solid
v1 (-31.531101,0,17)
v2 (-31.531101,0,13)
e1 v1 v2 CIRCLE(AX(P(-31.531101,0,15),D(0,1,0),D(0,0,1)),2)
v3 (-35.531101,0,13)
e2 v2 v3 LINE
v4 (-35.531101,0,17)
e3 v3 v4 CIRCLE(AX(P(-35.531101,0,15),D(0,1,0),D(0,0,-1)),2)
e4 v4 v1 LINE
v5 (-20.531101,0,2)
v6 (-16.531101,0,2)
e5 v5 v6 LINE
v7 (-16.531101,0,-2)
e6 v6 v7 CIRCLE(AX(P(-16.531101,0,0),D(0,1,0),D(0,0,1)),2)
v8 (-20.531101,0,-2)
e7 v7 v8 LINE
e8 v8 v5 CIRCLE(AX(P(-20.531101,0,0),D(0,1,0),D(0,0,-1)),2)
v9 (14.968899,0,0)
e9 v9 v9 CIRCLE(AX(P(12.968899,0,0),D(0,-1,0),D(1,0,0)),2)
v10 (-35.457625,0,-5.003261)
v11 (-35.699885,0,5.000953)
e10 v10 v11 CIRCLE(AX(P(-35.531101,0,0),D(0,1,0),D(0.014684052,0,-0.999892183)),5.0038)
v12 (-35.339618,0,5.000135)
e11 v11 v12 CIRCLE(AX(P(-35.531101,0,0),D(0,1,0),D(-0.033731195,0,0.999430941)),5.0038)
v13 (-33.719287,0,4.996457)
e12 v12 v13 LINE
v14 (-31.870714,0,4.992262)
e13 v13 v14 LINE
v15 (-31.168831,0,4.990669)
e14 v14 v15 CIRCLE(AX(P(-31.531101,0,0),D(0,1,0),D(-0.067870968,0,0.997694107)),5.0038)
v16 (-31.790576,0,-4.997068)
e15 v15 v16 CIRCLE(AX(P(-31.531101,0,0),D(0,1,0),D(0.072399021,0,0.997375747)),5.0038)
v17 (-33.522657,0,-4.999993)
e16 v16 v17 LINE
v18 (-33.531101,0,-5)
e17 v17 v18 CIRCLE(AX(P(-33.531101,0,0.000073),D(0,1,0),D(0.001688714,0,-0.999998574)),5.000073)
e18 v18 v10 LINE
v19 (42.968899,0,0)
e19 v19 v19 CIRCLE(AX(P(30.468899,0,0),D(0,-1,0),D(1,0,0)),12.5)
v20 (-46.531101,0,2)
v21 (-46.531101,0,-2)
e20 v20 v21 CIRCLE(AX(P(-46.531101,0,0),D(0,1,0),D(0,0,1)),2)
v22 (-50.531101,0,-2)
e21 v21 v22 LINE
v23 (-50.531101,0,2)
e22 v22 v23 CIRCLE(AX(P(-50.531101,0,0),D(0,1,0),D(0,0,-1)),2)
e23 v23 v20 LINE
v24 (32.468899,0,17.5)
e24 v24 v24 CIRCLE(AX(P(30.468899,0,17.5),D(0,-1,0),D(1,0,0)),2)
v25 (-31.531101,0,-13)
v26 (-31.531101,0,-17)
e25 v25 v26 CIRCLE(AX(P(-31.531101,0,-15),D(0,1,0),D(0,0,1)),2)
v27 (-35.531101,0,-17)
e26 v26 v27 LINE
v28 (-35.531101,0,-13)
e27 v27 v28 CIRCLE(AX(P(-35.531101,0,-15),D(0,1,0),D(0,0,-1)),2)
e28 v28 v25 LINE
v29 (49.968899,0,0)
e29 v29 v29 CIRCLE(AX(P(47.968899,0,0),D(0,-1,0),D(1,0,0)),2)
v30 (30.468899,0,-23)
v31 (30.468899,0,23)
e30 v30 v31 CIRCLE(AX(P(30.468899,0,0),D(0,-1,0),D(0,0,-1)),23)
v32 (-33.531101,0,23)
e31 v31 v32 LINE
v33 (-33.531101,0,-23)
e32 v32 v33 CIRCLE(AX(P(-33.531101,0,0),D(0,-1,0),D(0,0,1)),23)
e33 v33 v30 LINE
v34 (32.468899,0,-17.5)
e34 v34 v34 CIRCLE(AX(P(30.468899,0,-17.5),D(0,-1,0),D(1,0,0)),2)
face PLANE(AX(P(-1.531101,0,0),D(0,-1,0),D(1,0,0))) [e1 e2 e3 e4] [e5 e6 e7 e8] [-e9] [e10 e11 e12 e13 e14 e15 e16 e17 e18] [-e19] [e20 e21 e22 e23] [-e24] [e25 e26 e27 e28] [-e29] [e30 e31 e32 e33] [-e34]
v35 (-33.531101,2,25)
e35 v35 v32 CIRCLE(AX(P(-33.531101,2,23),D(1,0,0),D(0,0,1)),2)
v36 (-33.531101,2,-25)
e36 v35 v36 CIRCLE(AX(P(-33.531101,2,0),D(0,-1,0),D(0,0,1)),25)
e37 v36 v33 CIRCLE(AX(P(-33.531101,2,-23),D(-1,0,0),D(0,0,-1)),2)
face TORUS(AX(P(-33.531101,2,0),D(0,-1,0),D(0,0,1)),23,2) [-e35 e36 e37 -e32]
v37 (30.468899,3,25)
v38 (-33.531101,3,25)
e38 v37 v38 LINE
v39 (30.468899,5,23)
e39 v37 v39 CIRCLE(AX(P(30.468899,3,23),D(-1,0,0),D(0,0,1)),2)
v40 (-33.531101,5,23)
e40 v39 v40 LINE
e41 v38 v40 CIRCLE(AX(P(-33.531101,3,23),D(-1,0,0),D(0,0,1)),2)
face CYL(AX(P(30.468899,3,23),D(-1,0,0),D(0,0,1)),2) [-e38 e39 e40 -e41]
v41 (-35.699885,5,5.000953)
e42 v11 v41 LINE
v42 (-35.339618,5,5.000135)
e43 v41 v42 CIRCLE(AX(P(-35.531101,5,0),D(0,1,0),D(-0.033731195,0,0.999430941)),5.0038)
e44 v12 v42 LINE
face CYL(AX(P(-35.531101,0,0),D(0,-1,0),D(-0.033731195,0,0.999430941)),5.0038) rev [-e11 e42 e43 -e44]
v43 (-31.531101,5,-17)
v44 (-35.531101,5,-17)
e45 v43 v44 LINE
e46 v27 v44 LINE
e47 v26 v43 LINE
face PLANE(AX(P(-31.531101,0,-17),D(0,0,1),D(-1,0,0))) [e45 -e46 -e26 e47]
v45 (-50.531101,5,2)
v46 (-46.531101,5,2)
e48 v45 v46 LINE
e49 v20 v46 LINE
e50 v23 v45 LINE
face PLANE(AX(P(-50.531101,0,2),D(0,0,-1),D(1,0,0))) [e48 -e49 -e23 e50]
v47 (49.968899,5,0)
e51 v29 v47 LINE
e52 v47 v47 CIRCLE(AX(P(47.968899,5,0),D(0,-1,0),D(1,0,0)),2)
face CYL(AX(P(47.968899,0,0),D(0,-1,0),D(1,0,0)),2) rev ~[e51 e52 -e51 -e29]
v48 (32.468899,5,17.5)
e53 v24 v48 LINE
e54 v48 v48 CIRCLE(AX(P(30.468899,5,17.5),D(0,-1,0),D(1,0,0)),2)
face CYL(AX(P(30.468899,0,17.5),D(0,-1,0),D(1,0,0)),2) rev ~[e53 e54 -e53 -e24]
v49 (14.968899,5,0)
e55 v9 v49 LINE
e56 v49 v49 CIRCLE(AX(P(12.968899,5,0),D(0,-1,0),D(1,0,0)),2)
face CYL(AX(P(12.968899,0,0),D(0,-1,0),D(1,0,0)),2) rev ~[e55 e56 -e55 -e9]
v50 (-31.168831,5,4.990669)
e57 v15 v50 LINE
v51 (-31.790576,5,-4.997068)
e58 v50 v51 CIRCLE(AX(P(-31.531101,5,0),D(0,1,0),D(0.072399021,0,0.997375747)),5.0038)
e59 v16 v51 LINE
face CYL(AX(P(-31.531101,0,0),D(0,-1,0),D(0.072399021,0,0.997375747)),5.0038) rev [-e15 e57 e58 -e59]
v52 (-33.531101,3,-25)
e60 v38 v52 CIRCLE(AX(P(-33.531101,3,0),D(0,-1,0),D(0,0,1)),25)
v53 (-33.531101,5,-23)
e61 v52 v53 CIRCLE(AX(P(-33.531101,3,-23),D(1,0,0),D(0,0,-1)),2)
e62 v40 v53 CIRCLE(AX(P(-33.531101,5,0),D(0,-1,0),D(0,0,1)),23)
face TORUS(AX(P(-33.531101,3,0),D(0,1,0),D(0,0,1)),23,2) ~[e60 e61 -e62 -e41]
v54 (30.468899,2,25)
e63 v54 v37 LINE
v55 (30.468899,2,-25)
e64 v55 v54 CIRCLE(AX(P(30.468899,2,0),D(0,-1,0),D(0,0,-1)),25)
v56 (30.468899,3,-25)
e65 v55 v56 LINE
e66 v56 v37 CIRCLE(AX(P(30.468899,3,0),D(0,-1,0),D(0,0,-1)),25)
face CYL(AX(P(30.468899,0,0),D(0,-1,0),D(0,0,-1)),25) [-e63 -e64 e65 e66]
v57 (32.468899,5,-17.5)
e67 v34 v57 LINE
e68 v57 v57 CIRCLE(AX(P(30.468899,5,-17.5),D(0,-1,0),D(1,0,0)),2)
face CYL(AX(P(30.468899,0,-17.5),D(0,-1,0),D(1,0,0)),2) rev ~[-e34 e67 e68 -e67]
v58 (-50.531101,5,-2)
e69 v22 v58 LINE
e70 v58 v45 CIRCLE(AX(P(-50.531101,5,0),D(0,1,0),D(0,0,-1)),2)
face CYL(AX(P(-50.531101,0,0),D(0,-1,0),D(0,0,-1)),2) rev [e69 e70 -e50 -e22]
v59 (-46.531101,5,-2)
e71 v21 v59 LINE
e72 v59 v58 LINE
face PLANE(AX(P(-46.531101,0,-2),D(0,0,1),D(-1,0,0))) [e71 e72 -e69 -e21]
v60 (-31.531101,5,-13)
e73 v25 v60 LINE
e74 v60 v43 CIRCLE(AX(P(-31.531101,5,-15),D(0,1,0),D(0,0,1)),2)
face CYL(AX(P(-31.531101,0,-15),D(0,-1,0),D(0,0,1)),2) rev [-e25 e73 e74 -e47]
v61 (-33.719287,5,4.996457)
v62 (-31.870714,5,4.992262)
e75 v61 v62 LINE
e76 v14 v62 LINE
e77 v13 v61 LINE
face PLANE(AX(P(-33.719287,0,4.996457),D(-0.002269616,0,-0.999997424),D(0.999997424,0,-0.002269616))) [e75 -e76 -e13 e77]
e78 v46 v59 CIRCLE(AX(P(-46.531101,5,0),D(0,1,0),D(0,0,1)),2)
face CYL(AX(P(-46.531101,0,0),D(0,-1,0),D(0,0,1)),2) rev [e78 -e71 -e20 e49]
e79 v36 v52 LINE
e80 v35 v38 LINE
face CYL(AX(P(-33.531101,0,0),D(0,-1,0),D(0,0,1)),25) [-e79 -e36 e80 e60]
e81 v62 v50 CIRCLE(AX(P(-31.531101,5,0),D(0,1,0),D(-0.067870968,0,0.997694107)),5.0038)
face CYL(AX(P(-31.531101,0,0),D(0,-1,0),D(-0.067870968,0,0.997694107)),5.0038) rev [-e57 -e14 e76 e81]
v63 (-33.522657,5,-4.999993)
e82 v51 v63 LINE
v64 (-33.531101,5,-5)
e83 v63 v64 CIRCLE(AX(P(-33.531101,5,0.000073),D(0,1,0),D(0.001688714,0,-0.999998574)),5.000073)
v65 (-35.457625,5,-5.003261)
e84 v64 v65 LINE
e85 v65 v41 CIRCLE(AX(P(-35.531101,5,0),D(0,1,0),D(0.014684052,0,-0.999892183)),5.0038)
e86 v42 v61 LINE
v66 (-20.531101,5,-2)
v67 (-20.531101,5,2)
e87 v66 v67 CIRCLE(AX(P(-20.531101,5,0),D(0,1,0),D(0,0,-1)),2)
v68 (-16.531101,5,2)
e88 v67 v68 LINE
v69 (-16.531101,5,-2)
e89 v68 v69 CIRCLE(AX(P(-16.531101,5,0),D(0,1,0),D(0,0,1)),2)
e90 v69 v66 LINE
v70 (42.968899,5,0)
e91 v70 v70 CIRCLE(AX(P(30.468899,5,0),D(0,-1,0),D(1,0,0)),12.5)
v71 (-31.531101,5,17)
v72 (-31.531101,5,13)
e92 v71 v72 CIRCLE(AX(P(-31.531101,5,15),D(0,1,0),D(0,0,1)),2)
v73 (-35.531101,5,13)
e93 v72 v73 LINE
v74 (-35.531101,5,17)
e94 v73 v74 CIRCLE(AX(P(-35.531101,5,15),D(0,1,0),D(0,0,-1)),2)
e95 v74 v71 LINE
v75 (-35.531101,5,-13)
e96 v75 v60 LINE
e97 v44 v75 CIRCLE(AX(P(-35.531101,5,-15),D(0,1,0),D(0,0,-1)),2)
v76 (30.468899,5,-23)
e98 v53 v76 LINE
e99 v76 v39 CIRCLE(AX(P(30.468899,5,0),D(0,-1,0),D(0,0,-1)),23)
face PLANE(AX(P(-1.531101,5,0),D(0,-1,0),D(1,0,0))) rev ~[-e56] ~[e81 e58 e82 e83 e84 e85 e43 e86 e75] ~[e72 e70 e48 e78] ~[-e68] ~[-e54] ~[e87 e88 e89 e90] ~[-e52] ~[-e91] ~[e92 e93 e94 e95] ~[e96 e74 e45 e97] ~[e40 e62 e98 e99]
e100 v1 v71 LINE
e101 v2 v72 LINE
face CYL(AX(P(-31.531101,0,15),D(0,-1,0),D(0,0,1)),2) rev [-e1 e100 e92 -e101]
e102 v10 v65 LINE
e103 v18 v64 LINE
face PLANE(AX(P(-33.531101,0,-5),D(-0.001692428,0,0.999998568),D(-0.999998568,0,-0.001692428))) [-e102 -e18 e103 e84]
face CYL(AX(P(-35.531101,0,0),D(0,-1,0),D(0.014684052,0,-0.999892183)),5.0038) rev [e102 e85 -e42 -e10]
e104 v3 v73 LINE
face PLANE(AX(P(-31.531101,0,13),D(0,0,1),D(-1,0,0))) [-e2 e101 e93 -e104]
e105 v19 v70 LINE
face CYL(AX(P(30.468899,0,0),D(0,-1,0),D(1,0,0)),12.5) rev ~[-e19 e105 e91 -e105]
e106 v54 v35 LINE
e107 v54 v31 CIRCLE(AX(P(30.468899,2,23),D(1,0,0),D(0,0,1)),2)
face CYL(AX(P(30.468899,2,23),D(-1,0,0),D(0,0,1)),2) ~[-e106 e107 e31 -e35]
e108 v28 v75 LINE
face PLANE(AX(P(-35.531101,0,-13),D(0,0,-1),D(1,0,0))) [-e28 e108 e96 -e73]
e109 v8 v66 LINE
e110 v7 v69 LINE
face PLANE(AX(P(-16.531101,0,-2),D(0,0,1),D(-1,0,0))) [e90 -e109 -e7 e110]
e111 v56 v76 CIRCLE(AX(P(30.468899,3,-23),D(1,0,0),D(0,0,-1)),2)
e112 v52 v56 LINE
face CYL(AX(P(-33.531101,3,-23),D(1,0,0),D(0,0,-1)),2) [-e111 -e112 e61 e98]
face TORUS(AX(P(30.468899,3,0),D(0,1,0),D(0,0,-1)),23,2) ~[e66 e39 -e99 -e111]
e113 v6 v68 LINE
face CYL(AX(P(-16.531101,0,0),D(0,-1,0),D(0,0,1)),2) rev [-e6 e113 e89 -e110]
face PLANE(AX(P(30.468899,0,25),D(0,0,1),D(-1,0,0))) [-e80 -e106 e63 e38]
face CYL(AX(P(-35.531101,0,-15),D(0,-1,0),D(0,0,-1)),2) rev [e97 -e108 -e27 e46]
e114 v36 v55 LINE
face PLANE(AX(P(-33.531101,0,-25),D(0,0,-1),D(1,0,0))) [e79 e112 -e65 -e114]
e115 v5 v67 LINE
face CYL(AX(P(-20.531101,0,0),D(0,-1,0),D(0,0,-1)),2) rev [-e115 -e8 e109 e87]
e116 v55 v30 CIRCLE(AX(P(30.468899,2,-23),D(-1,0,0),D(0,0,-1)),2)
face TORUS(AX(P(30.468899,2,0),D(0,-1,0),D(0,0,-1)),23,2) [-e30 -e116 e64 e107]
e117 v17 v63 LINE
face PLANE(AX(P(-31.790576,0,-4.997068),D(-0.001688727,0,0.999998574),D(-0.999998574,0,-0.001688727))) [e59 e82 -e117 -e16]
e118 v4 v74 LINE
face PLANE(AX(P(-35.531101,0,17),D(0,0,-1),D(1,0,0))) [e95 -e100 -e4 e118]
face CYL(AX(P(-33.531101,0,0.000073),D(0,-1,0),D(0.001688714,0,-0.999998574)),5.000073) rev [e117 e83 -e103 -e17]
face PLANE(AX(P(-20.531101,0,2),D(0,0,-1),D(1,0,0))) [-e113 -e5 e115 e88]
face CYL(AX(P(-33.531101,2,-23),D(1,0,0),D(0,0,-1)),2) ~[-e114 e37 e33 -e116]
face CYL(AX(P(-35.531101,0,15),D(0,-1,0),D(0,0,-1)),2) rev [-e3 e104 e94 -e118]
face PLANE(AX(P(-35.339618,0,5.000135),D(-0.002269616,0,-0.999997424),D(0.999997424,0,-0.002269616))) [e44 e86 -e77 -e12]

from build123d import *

# Parameters (mm, degrees)
F0_R     = 2
F0_R_2   = 12.5
F1_DEPTH = 5
F2_R     = 2


# Not quite as in the source:
# - two fillets or chamfers of one size are made in one step
# - ends of sketch curves that miss each other by under 0.0002 mm in the source are joined


with BuildPart() as f1:
    # F0 (on Front) → F1 (new body)
    with BuildSketch(Plane.XZ):
        with BuildLine():
            Line((30.4688991789, 25), (-33.5311008211, 25))
            ThreePointArc((-33.5311008211, 25), (-58.5311008211, 0), (-33.5311008211, -25))
            Line((-33.5311008211, -25), (30.4688991789, -25))
            ThreePointArc((30.4688991789, -25), (55.4688991789, 0), (30.4688991789, 25))
        make_face()
        with BuildLine():
            ThreePointArc((-31.5311008211, -13), (-29.5311008211, -15), (-31.5311008211, -17))
            Line((-31.5311008211, -17), (-35.5311008211, -17))
            ThreePointArc((-35.5311008211, -17), (-37.5311008211, -15), (-35.5311008211, -13))
            Line((-35.5311008211, -13), (-31.5311008211, -13))
        make_face(mode=Mode.SUBTRACT)
        with BuildLine():
            ThreePointArc((-35.6998849753, 5.0009525442), (-35.5197441178, 5.0037871123), (-35.3396179829, 5.0001348744))
            Line((-35.3396179829, 5.0001348744), (-33.7192871231, 4.9964573365))
            Line((-33.7192871231, 4.9964573365), (-31.8707135701, 4.9922617741))
            ThreePointArc((-31.8707135701, 4.9922617741), (-31.5197441178, 5.0037871123), (-31.1688305974, 4.9906687653))
            ThreePointArc((-31.1688305974, 4.9906687653), (-26.5369680234, -0.310889109), (-31.7905758861, -4.9970678533))
            Line((-31.7905758861, -4.9970678533), (-33.5226571845, -4.9999928705))
            ThreePointArc((-33.5226571845, -4.9999928705), (-33.5268790013, -4.9999982176), (-33.5311008211, -5))
            Line((-33.5311008211, -5), (-35.4576247605, -5.0032605078))
            ThreePointArc((-35.4576247605, -5.0032605078), (-40.5334343372, -0.1211356041), (-35.6998849753, 5.0009525442))
        make_face(mode=Mode.SUBTRACT)
        with Locations((30.4688991789, -17.5)):
            Circle(F0_R, mode=Mode.SUBTRACT)
        with BuildLine():
            ThreePointArc((-46.5311008211, 2), (-44.5311008211, 0), (-46.5311008211, -2))
            Line((-46.5311008211, -2), (-50.5311008211, -2))
            ThreePointArc((-50.5311008211, -2), (-52.5311008211, 0), (-50.5311008211, 2))
            Line((-50.5311008211, 2), (-46.5311008211, 2))
        make_face(mode=Mode.SUBTRACT)
        with BuildLine():
            ThreePointArc((-20.5311008211, -2), (-22.5311008211, 0), (-20.5311008211, 2))
            Line((-20.5311008211, 2), (-16.5311008211, 2))
            ThreePointArc((-16.5311008211, 2), (-14.5311008211, 0), (-16.5311008211, -2))
            Line((-16.5311008211, -2), (-20.5311008211, -2))
        make_face(mode=Mode.SUBTRACT)
        with BuildLine():
            ThreePointArc((-31.5311008211, 17), (-29.5311008211, 15), (-31.5311008211, 13))
            Line((-31.5311008211, 13), (-35.5311008211, 13))
            ThreePointArc((-35.5311008211, 13), (-37.5311008211, 15), (-35.5311008211, 17))
            Line((-35.5311008211, 17), (-31.5311008211, 17))
        make_face(mode=Mode.SUBTRACT)
        with Locations((12.9688991789, 0)):
            Circle(F0_R, mode=Mode.SUBTRACT)
        with Locations((30.4688991789, 0)):
            Circle(F0_R_2, mode=Mode.SUBTRACT)
        with Locations((47.9688991789, 0)):
            Circle(F0_R, mode=Mode.SUBTRACT)
        with Locations((30.4688991789, 17.5)):
            Circle(F0_R, mode=Mode.SUBTRACT)
    extrude(amount=-F1_DEPTH)

    # F2
    f2_edges = [f1.edges().sort_by_distance(p)[0] for p in [
        (55.468899, 5, 0),
        (-1.531101, 0, 25),
        (-1.531101, 5, 25),
        (-58.531101, 5, 0),
        (-1.531101, 5, -25),
        (-1.531101, 0, -25),
        (-58.531101, 0, 0),
        (55.468899, 0, 0),
    ]]
    fillet(f2_edges, radius=F2_R)


solid = f1.part
